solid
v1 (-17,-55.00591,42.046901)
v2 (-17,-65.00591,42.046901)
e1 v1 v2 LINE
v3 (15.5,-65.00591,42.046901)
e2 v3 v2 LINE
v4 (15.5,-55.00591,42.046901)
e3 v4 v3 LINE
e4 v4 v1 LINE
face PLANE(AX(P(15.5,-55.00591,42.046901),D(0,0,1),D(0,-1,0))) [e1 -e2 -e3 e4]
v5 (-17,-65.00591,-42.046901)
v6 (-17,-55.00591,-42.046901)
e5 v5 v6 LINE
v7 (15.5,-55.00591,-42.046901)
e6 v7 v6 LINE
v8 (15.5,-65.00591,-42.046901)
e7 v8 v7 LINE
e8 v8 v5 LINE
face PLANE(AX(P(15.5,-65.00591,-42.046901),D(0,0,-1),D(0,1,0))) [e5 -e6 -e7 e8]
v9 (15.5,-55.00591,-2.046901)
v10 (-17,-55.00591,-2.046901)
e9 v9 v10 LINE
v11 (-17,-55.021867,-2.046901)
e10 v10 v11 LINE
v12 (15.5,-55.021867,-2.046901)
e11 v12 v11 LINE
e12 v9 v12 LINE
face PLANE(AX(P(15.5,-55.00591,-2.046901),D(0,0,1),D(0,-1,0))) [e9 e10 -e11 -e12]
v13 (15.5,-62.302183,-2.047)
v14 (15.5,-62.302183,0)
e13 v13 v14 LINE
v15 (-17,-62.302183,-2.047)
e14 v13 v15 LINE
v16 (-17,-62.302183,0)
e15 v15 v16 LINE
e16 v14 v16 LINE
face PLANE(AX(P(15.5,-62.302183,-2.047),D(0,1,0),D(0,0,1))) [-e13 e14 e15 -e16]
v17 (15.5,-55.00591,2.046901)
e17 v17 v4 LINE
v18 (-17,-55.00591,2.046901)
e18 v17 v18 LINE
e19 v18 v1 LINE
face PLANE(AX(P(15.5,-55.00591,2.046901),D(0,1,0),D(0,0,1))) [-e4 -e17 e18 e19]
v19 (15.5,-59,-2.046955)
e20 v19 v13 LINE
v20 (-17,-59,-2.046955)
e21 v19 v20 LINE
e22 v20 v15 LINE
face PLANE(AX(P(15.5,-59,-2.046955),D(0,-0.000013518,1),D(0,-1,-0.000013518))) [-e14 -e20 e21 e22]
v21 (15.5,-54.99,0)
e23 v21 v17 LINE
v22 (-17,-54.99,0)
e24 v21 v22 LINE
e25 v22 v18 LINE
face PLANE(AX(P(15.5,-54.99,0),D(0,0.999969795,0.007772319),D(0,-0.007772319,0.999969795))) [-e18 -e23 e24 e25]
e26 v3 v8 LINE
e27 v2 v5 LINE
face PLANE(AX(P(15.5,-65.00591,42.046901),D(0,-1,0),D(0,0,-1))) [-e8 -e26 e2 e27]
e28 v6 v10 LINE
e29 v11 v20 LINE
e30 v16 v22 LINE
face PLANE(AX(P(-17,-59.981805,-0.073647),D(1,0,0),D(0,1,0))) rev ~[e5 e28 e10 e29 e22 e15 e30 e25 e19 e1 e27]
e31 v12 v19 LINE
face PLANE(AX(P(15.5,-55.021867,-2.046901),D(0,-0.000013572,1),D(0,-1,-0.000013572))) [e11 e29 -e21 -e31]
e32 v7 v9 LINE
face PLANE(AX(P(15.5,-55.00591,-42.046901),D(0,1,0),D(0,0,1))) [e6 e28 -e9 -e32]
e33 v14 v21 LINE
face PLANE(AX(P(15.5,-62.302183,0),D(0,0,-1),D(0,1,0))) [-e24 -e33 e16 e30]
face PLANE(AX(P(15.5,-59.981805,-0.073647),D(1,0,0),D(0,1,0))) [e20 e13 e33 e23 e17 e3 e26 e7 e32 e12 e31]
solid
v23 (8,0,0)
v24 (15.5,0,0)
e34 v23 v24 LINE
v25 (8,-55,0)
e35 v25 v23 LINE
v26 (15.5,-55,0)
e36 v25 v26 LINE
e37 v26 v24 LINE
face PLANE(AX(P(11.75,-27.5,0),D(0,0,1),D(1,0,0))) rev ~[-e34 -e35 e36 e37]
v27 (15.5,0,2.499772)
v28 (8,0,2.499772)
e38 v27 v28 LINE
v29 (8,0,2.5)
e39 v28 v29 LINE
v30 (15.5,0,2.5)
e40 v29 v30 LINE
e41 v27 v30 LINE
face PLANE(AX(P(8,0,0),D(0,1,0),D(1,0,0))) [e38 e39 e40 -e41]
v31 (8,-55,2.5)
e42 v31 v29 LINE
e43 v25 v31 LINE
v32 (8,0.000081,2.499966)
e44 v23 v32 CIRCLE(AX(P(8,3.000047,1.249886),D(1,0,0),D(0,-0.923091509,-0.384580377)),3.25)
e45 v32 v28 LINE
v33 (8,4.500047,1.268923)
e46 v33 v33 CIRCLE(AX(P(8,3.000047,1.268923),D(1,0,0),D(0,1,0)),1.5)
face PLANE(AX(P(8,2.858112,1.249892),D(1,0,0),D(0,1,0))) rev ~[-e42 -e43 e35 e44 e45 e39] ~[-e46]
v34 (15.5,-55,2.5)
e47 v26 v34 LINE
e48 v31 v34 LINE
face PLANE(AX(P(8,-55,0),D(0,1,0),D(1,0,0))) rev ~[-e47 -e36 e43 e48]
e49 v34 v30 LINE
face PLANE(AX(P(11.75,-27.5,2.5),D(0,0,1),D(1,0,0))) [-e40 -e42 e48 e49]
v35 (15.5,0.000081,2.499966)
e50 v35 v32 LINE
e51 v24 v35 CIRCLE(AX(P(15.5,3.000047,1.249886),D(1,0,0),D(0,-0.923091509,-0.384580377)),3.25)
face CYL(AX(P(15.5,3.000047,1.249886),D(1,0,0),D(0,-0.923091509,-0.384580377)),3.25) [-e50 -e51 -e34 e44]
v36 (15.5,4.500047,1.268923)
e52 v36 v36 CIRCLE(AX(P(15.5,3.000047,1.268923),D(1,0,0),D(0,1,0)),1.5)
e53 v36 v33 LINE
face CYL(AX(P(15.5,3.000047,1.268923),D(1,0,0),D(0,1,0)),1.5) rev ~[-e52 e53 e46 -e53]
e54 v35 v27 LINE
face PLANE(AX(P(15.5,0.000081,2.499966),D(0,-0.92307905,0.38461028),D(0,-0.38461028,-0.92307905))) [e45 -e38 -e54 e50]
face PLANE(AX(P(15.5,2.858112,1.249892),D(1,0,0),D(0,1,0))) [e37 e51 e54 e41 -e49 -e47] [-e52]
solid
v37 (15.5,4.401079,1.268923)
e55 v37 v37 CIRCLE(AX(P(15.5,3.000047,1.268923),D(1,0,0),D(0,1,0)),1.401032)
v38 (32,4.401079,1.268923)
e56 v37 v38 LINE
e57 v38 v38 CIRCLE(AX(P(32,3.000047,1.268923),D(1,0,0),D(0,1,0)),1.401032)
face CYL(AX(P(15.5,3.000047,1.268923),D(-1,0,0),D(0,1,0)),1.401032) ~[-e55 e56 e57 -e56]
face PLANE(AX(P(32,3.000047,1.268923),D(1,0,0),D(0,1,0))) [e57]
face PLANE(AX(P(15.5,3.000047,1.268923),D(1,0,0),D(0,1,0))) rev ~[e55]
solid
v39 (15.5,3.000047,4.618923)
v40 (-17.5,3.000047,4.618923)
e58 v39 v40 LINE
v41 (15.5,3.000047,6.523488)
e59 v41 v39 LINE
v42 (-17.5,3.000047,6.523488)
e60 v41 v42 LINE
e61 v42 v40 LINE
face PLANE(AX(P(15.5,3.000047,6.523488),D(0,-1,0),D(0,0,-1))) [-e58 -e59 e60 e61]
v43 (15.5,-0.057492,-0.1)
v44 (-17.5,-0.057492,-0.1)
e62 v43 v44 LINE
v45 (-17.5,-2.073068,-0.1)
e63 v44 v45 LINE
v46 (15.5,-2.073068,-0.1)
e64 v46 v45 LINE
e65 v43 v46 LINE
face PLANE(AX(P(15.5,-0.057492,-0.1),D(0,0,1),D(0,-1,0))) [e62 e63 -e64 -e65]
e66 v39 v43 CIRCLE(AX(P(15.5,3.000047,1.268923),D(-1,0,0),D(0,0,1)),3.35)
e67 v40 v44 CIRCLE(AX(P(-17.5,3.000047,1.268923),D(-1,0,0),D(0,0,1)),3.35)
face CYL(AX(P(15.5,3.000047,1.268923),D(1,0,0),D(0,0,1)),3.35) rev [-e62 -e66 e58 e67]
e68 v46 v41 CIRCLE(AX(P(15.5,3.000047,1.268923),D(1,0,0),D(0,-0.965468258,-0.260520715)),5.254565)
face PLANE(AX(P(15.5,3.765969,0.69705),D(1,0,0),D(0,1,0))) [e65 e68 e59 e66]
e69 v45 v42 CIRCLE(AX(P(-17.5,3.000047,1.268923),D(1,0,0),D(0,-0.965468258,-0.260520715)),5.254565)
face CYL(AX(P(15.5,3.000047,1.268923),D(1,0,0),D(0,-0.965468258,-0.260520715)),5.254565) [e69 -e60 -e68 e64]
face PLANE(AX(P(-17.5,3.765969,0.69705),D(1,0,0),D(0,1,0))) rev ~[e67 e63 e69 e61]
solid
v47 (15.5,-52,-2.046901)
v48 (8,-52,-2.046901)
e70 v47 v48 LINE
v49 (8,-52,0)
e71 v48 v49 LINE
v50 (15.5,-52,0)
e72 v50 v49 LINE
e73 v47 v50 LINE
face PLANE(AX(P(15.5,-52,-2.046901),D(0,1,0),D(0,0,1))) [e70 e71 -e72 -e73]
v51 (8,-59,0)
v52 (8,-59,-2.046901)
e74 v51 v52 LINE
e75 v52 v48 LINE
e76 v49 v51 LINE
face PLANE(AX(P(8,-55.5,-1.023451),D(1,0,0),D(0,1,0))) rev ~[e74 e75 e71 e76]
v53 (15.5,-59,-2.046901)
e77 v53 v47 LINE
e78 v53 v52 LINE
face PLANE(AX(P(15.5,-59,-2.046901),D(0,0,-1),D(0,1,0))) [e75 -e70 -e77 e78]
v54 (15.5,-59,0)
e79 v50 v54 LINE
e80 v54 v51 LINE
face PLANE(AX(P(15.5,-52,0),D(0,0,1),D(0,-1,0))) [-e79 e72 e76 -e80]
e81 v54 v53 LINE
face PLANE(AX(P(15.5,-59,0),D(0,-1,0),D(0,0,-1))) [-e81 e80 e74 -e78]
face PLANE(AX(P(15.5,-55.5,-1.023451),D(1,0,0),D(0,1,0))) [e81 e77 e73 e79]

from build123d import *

# Parameters (mm, degrees)
F0_W      = 7.5
F0_H      = 55
F1_DEPTH  = 2.5
F2_R      = 1.5
F3_DEPTH  = 7.5
F5_DEPTH  = 33
F2_R_2    = 1.4010319541
F6_DEPTH  = 16.5
F9_DEPTH  = 7.5
F11_DEPTH = 32.5


# Not quite as in the source:
# - ends of sketch curves that miss each other by under 0.0002 mm in the source are joined
# - the program builds the solid bodies; features that only make, move or delete a surface that nothing else refers to are left out


with BuildPart() as f1:
    # F0 (on Top) → F1 (new body)
    with BuildSketch(Plane.XY):
        with Locations((11.75, -27.5)):
            Rectangle(F0_W, F0_H)
    extrude(amount=F1_DEPTH)

    # F2 (on face) → F3 (join)
    with BuildSketch(Plane.YZ.offset(15.5)):
        with BuildLine():
            ThreePointArc((0, 0), (6.2500474018, 1.249781204), (8.07847e-05, 2.4999663372))
            Line((8.07847e-05, 2.4999663372), (0, 2.4997724509))
            Line((0, 2.4997724509), (0, 0))
        make_face()
        with Locations((3.0000474035, 1.2689229439)):
            Circle(F2_R, mode=Mode.SUBTRACT)
    extrude(amount=-F3_DEPTH)


with BuildPart() as f5:
    # F2 (on face) → F5 (new body)
    with BuildSketch(Plane.YZ.offset(15.5)):
        with BuildLine():
            Line((-0.0574924529, -0.1), (-2.0730679938, -0.1))
            ThreePointArc((-2.0730679938, -0.1), (7.1715905231, -1.926179224), (3.0000474035, 6.5234876129))
            Line((3.0000474035, 6.5234876129), (3.0000474035, 4.6189229439))
            ThreePointArc((3.0000474035, 4.6189229439), (5.8114875916, -0.552698331), (-0.0574924529, -0.1))
        make_face()
    extrude(amount=-F5_DEPTH)


with BuildPart() as f6:
    # F2 (on face) → F6 (new body)
    with BuildSketch(Plane.YZ.offset(15.5)):
        with Locations((3.0000474035, 1.2689229439)):
            Circle(F2_R_2)
    extrude(amount=F6_DEPTH)


with BuildPart() as f9:
    # F8 (on face) → F9 (new body)
    with BuildSketch(Plane.YZ.offset(15.5)):
        Polygon((-52, -2.0469013694), (-52, 0), (-55, 0), (-59, 0), (-59, -2.0469013694), align=None)
    extrude(amount=-F9_DEPTH)


with BuildPart() as f11:
    # F10 (on face) → F11 (new body)
    with BuildSketch(Plane.YZ.offset(15.5)):
        Polygon((-59, 0), (-55.021867156, 0), (-54.99, 0), (-55.0059096515, 2.0469013694), (-55.0059096515, 42.0469013694), (-65.0059096515, 42.0469013694), (-65.0059096515, 2.0470365488), (-65.0059096515, 0), (-65.0059096515, -2.0470365488), (-65.0059096515, -42.0469013694), (-55.0059096515, -42.0469013694), (-55.0059096515, -2.0469013694), (-55.021867156, -2.0469013694), (-58.9999999993, -2.0469553613), (-62.3021833599, -2.047), (-62.3021833599, 0), align=None)
    extrude(amount=-F11_DEPTH)


solid = Compound([f1.part, f5.part, f6.part, f9.part, f11.part])
